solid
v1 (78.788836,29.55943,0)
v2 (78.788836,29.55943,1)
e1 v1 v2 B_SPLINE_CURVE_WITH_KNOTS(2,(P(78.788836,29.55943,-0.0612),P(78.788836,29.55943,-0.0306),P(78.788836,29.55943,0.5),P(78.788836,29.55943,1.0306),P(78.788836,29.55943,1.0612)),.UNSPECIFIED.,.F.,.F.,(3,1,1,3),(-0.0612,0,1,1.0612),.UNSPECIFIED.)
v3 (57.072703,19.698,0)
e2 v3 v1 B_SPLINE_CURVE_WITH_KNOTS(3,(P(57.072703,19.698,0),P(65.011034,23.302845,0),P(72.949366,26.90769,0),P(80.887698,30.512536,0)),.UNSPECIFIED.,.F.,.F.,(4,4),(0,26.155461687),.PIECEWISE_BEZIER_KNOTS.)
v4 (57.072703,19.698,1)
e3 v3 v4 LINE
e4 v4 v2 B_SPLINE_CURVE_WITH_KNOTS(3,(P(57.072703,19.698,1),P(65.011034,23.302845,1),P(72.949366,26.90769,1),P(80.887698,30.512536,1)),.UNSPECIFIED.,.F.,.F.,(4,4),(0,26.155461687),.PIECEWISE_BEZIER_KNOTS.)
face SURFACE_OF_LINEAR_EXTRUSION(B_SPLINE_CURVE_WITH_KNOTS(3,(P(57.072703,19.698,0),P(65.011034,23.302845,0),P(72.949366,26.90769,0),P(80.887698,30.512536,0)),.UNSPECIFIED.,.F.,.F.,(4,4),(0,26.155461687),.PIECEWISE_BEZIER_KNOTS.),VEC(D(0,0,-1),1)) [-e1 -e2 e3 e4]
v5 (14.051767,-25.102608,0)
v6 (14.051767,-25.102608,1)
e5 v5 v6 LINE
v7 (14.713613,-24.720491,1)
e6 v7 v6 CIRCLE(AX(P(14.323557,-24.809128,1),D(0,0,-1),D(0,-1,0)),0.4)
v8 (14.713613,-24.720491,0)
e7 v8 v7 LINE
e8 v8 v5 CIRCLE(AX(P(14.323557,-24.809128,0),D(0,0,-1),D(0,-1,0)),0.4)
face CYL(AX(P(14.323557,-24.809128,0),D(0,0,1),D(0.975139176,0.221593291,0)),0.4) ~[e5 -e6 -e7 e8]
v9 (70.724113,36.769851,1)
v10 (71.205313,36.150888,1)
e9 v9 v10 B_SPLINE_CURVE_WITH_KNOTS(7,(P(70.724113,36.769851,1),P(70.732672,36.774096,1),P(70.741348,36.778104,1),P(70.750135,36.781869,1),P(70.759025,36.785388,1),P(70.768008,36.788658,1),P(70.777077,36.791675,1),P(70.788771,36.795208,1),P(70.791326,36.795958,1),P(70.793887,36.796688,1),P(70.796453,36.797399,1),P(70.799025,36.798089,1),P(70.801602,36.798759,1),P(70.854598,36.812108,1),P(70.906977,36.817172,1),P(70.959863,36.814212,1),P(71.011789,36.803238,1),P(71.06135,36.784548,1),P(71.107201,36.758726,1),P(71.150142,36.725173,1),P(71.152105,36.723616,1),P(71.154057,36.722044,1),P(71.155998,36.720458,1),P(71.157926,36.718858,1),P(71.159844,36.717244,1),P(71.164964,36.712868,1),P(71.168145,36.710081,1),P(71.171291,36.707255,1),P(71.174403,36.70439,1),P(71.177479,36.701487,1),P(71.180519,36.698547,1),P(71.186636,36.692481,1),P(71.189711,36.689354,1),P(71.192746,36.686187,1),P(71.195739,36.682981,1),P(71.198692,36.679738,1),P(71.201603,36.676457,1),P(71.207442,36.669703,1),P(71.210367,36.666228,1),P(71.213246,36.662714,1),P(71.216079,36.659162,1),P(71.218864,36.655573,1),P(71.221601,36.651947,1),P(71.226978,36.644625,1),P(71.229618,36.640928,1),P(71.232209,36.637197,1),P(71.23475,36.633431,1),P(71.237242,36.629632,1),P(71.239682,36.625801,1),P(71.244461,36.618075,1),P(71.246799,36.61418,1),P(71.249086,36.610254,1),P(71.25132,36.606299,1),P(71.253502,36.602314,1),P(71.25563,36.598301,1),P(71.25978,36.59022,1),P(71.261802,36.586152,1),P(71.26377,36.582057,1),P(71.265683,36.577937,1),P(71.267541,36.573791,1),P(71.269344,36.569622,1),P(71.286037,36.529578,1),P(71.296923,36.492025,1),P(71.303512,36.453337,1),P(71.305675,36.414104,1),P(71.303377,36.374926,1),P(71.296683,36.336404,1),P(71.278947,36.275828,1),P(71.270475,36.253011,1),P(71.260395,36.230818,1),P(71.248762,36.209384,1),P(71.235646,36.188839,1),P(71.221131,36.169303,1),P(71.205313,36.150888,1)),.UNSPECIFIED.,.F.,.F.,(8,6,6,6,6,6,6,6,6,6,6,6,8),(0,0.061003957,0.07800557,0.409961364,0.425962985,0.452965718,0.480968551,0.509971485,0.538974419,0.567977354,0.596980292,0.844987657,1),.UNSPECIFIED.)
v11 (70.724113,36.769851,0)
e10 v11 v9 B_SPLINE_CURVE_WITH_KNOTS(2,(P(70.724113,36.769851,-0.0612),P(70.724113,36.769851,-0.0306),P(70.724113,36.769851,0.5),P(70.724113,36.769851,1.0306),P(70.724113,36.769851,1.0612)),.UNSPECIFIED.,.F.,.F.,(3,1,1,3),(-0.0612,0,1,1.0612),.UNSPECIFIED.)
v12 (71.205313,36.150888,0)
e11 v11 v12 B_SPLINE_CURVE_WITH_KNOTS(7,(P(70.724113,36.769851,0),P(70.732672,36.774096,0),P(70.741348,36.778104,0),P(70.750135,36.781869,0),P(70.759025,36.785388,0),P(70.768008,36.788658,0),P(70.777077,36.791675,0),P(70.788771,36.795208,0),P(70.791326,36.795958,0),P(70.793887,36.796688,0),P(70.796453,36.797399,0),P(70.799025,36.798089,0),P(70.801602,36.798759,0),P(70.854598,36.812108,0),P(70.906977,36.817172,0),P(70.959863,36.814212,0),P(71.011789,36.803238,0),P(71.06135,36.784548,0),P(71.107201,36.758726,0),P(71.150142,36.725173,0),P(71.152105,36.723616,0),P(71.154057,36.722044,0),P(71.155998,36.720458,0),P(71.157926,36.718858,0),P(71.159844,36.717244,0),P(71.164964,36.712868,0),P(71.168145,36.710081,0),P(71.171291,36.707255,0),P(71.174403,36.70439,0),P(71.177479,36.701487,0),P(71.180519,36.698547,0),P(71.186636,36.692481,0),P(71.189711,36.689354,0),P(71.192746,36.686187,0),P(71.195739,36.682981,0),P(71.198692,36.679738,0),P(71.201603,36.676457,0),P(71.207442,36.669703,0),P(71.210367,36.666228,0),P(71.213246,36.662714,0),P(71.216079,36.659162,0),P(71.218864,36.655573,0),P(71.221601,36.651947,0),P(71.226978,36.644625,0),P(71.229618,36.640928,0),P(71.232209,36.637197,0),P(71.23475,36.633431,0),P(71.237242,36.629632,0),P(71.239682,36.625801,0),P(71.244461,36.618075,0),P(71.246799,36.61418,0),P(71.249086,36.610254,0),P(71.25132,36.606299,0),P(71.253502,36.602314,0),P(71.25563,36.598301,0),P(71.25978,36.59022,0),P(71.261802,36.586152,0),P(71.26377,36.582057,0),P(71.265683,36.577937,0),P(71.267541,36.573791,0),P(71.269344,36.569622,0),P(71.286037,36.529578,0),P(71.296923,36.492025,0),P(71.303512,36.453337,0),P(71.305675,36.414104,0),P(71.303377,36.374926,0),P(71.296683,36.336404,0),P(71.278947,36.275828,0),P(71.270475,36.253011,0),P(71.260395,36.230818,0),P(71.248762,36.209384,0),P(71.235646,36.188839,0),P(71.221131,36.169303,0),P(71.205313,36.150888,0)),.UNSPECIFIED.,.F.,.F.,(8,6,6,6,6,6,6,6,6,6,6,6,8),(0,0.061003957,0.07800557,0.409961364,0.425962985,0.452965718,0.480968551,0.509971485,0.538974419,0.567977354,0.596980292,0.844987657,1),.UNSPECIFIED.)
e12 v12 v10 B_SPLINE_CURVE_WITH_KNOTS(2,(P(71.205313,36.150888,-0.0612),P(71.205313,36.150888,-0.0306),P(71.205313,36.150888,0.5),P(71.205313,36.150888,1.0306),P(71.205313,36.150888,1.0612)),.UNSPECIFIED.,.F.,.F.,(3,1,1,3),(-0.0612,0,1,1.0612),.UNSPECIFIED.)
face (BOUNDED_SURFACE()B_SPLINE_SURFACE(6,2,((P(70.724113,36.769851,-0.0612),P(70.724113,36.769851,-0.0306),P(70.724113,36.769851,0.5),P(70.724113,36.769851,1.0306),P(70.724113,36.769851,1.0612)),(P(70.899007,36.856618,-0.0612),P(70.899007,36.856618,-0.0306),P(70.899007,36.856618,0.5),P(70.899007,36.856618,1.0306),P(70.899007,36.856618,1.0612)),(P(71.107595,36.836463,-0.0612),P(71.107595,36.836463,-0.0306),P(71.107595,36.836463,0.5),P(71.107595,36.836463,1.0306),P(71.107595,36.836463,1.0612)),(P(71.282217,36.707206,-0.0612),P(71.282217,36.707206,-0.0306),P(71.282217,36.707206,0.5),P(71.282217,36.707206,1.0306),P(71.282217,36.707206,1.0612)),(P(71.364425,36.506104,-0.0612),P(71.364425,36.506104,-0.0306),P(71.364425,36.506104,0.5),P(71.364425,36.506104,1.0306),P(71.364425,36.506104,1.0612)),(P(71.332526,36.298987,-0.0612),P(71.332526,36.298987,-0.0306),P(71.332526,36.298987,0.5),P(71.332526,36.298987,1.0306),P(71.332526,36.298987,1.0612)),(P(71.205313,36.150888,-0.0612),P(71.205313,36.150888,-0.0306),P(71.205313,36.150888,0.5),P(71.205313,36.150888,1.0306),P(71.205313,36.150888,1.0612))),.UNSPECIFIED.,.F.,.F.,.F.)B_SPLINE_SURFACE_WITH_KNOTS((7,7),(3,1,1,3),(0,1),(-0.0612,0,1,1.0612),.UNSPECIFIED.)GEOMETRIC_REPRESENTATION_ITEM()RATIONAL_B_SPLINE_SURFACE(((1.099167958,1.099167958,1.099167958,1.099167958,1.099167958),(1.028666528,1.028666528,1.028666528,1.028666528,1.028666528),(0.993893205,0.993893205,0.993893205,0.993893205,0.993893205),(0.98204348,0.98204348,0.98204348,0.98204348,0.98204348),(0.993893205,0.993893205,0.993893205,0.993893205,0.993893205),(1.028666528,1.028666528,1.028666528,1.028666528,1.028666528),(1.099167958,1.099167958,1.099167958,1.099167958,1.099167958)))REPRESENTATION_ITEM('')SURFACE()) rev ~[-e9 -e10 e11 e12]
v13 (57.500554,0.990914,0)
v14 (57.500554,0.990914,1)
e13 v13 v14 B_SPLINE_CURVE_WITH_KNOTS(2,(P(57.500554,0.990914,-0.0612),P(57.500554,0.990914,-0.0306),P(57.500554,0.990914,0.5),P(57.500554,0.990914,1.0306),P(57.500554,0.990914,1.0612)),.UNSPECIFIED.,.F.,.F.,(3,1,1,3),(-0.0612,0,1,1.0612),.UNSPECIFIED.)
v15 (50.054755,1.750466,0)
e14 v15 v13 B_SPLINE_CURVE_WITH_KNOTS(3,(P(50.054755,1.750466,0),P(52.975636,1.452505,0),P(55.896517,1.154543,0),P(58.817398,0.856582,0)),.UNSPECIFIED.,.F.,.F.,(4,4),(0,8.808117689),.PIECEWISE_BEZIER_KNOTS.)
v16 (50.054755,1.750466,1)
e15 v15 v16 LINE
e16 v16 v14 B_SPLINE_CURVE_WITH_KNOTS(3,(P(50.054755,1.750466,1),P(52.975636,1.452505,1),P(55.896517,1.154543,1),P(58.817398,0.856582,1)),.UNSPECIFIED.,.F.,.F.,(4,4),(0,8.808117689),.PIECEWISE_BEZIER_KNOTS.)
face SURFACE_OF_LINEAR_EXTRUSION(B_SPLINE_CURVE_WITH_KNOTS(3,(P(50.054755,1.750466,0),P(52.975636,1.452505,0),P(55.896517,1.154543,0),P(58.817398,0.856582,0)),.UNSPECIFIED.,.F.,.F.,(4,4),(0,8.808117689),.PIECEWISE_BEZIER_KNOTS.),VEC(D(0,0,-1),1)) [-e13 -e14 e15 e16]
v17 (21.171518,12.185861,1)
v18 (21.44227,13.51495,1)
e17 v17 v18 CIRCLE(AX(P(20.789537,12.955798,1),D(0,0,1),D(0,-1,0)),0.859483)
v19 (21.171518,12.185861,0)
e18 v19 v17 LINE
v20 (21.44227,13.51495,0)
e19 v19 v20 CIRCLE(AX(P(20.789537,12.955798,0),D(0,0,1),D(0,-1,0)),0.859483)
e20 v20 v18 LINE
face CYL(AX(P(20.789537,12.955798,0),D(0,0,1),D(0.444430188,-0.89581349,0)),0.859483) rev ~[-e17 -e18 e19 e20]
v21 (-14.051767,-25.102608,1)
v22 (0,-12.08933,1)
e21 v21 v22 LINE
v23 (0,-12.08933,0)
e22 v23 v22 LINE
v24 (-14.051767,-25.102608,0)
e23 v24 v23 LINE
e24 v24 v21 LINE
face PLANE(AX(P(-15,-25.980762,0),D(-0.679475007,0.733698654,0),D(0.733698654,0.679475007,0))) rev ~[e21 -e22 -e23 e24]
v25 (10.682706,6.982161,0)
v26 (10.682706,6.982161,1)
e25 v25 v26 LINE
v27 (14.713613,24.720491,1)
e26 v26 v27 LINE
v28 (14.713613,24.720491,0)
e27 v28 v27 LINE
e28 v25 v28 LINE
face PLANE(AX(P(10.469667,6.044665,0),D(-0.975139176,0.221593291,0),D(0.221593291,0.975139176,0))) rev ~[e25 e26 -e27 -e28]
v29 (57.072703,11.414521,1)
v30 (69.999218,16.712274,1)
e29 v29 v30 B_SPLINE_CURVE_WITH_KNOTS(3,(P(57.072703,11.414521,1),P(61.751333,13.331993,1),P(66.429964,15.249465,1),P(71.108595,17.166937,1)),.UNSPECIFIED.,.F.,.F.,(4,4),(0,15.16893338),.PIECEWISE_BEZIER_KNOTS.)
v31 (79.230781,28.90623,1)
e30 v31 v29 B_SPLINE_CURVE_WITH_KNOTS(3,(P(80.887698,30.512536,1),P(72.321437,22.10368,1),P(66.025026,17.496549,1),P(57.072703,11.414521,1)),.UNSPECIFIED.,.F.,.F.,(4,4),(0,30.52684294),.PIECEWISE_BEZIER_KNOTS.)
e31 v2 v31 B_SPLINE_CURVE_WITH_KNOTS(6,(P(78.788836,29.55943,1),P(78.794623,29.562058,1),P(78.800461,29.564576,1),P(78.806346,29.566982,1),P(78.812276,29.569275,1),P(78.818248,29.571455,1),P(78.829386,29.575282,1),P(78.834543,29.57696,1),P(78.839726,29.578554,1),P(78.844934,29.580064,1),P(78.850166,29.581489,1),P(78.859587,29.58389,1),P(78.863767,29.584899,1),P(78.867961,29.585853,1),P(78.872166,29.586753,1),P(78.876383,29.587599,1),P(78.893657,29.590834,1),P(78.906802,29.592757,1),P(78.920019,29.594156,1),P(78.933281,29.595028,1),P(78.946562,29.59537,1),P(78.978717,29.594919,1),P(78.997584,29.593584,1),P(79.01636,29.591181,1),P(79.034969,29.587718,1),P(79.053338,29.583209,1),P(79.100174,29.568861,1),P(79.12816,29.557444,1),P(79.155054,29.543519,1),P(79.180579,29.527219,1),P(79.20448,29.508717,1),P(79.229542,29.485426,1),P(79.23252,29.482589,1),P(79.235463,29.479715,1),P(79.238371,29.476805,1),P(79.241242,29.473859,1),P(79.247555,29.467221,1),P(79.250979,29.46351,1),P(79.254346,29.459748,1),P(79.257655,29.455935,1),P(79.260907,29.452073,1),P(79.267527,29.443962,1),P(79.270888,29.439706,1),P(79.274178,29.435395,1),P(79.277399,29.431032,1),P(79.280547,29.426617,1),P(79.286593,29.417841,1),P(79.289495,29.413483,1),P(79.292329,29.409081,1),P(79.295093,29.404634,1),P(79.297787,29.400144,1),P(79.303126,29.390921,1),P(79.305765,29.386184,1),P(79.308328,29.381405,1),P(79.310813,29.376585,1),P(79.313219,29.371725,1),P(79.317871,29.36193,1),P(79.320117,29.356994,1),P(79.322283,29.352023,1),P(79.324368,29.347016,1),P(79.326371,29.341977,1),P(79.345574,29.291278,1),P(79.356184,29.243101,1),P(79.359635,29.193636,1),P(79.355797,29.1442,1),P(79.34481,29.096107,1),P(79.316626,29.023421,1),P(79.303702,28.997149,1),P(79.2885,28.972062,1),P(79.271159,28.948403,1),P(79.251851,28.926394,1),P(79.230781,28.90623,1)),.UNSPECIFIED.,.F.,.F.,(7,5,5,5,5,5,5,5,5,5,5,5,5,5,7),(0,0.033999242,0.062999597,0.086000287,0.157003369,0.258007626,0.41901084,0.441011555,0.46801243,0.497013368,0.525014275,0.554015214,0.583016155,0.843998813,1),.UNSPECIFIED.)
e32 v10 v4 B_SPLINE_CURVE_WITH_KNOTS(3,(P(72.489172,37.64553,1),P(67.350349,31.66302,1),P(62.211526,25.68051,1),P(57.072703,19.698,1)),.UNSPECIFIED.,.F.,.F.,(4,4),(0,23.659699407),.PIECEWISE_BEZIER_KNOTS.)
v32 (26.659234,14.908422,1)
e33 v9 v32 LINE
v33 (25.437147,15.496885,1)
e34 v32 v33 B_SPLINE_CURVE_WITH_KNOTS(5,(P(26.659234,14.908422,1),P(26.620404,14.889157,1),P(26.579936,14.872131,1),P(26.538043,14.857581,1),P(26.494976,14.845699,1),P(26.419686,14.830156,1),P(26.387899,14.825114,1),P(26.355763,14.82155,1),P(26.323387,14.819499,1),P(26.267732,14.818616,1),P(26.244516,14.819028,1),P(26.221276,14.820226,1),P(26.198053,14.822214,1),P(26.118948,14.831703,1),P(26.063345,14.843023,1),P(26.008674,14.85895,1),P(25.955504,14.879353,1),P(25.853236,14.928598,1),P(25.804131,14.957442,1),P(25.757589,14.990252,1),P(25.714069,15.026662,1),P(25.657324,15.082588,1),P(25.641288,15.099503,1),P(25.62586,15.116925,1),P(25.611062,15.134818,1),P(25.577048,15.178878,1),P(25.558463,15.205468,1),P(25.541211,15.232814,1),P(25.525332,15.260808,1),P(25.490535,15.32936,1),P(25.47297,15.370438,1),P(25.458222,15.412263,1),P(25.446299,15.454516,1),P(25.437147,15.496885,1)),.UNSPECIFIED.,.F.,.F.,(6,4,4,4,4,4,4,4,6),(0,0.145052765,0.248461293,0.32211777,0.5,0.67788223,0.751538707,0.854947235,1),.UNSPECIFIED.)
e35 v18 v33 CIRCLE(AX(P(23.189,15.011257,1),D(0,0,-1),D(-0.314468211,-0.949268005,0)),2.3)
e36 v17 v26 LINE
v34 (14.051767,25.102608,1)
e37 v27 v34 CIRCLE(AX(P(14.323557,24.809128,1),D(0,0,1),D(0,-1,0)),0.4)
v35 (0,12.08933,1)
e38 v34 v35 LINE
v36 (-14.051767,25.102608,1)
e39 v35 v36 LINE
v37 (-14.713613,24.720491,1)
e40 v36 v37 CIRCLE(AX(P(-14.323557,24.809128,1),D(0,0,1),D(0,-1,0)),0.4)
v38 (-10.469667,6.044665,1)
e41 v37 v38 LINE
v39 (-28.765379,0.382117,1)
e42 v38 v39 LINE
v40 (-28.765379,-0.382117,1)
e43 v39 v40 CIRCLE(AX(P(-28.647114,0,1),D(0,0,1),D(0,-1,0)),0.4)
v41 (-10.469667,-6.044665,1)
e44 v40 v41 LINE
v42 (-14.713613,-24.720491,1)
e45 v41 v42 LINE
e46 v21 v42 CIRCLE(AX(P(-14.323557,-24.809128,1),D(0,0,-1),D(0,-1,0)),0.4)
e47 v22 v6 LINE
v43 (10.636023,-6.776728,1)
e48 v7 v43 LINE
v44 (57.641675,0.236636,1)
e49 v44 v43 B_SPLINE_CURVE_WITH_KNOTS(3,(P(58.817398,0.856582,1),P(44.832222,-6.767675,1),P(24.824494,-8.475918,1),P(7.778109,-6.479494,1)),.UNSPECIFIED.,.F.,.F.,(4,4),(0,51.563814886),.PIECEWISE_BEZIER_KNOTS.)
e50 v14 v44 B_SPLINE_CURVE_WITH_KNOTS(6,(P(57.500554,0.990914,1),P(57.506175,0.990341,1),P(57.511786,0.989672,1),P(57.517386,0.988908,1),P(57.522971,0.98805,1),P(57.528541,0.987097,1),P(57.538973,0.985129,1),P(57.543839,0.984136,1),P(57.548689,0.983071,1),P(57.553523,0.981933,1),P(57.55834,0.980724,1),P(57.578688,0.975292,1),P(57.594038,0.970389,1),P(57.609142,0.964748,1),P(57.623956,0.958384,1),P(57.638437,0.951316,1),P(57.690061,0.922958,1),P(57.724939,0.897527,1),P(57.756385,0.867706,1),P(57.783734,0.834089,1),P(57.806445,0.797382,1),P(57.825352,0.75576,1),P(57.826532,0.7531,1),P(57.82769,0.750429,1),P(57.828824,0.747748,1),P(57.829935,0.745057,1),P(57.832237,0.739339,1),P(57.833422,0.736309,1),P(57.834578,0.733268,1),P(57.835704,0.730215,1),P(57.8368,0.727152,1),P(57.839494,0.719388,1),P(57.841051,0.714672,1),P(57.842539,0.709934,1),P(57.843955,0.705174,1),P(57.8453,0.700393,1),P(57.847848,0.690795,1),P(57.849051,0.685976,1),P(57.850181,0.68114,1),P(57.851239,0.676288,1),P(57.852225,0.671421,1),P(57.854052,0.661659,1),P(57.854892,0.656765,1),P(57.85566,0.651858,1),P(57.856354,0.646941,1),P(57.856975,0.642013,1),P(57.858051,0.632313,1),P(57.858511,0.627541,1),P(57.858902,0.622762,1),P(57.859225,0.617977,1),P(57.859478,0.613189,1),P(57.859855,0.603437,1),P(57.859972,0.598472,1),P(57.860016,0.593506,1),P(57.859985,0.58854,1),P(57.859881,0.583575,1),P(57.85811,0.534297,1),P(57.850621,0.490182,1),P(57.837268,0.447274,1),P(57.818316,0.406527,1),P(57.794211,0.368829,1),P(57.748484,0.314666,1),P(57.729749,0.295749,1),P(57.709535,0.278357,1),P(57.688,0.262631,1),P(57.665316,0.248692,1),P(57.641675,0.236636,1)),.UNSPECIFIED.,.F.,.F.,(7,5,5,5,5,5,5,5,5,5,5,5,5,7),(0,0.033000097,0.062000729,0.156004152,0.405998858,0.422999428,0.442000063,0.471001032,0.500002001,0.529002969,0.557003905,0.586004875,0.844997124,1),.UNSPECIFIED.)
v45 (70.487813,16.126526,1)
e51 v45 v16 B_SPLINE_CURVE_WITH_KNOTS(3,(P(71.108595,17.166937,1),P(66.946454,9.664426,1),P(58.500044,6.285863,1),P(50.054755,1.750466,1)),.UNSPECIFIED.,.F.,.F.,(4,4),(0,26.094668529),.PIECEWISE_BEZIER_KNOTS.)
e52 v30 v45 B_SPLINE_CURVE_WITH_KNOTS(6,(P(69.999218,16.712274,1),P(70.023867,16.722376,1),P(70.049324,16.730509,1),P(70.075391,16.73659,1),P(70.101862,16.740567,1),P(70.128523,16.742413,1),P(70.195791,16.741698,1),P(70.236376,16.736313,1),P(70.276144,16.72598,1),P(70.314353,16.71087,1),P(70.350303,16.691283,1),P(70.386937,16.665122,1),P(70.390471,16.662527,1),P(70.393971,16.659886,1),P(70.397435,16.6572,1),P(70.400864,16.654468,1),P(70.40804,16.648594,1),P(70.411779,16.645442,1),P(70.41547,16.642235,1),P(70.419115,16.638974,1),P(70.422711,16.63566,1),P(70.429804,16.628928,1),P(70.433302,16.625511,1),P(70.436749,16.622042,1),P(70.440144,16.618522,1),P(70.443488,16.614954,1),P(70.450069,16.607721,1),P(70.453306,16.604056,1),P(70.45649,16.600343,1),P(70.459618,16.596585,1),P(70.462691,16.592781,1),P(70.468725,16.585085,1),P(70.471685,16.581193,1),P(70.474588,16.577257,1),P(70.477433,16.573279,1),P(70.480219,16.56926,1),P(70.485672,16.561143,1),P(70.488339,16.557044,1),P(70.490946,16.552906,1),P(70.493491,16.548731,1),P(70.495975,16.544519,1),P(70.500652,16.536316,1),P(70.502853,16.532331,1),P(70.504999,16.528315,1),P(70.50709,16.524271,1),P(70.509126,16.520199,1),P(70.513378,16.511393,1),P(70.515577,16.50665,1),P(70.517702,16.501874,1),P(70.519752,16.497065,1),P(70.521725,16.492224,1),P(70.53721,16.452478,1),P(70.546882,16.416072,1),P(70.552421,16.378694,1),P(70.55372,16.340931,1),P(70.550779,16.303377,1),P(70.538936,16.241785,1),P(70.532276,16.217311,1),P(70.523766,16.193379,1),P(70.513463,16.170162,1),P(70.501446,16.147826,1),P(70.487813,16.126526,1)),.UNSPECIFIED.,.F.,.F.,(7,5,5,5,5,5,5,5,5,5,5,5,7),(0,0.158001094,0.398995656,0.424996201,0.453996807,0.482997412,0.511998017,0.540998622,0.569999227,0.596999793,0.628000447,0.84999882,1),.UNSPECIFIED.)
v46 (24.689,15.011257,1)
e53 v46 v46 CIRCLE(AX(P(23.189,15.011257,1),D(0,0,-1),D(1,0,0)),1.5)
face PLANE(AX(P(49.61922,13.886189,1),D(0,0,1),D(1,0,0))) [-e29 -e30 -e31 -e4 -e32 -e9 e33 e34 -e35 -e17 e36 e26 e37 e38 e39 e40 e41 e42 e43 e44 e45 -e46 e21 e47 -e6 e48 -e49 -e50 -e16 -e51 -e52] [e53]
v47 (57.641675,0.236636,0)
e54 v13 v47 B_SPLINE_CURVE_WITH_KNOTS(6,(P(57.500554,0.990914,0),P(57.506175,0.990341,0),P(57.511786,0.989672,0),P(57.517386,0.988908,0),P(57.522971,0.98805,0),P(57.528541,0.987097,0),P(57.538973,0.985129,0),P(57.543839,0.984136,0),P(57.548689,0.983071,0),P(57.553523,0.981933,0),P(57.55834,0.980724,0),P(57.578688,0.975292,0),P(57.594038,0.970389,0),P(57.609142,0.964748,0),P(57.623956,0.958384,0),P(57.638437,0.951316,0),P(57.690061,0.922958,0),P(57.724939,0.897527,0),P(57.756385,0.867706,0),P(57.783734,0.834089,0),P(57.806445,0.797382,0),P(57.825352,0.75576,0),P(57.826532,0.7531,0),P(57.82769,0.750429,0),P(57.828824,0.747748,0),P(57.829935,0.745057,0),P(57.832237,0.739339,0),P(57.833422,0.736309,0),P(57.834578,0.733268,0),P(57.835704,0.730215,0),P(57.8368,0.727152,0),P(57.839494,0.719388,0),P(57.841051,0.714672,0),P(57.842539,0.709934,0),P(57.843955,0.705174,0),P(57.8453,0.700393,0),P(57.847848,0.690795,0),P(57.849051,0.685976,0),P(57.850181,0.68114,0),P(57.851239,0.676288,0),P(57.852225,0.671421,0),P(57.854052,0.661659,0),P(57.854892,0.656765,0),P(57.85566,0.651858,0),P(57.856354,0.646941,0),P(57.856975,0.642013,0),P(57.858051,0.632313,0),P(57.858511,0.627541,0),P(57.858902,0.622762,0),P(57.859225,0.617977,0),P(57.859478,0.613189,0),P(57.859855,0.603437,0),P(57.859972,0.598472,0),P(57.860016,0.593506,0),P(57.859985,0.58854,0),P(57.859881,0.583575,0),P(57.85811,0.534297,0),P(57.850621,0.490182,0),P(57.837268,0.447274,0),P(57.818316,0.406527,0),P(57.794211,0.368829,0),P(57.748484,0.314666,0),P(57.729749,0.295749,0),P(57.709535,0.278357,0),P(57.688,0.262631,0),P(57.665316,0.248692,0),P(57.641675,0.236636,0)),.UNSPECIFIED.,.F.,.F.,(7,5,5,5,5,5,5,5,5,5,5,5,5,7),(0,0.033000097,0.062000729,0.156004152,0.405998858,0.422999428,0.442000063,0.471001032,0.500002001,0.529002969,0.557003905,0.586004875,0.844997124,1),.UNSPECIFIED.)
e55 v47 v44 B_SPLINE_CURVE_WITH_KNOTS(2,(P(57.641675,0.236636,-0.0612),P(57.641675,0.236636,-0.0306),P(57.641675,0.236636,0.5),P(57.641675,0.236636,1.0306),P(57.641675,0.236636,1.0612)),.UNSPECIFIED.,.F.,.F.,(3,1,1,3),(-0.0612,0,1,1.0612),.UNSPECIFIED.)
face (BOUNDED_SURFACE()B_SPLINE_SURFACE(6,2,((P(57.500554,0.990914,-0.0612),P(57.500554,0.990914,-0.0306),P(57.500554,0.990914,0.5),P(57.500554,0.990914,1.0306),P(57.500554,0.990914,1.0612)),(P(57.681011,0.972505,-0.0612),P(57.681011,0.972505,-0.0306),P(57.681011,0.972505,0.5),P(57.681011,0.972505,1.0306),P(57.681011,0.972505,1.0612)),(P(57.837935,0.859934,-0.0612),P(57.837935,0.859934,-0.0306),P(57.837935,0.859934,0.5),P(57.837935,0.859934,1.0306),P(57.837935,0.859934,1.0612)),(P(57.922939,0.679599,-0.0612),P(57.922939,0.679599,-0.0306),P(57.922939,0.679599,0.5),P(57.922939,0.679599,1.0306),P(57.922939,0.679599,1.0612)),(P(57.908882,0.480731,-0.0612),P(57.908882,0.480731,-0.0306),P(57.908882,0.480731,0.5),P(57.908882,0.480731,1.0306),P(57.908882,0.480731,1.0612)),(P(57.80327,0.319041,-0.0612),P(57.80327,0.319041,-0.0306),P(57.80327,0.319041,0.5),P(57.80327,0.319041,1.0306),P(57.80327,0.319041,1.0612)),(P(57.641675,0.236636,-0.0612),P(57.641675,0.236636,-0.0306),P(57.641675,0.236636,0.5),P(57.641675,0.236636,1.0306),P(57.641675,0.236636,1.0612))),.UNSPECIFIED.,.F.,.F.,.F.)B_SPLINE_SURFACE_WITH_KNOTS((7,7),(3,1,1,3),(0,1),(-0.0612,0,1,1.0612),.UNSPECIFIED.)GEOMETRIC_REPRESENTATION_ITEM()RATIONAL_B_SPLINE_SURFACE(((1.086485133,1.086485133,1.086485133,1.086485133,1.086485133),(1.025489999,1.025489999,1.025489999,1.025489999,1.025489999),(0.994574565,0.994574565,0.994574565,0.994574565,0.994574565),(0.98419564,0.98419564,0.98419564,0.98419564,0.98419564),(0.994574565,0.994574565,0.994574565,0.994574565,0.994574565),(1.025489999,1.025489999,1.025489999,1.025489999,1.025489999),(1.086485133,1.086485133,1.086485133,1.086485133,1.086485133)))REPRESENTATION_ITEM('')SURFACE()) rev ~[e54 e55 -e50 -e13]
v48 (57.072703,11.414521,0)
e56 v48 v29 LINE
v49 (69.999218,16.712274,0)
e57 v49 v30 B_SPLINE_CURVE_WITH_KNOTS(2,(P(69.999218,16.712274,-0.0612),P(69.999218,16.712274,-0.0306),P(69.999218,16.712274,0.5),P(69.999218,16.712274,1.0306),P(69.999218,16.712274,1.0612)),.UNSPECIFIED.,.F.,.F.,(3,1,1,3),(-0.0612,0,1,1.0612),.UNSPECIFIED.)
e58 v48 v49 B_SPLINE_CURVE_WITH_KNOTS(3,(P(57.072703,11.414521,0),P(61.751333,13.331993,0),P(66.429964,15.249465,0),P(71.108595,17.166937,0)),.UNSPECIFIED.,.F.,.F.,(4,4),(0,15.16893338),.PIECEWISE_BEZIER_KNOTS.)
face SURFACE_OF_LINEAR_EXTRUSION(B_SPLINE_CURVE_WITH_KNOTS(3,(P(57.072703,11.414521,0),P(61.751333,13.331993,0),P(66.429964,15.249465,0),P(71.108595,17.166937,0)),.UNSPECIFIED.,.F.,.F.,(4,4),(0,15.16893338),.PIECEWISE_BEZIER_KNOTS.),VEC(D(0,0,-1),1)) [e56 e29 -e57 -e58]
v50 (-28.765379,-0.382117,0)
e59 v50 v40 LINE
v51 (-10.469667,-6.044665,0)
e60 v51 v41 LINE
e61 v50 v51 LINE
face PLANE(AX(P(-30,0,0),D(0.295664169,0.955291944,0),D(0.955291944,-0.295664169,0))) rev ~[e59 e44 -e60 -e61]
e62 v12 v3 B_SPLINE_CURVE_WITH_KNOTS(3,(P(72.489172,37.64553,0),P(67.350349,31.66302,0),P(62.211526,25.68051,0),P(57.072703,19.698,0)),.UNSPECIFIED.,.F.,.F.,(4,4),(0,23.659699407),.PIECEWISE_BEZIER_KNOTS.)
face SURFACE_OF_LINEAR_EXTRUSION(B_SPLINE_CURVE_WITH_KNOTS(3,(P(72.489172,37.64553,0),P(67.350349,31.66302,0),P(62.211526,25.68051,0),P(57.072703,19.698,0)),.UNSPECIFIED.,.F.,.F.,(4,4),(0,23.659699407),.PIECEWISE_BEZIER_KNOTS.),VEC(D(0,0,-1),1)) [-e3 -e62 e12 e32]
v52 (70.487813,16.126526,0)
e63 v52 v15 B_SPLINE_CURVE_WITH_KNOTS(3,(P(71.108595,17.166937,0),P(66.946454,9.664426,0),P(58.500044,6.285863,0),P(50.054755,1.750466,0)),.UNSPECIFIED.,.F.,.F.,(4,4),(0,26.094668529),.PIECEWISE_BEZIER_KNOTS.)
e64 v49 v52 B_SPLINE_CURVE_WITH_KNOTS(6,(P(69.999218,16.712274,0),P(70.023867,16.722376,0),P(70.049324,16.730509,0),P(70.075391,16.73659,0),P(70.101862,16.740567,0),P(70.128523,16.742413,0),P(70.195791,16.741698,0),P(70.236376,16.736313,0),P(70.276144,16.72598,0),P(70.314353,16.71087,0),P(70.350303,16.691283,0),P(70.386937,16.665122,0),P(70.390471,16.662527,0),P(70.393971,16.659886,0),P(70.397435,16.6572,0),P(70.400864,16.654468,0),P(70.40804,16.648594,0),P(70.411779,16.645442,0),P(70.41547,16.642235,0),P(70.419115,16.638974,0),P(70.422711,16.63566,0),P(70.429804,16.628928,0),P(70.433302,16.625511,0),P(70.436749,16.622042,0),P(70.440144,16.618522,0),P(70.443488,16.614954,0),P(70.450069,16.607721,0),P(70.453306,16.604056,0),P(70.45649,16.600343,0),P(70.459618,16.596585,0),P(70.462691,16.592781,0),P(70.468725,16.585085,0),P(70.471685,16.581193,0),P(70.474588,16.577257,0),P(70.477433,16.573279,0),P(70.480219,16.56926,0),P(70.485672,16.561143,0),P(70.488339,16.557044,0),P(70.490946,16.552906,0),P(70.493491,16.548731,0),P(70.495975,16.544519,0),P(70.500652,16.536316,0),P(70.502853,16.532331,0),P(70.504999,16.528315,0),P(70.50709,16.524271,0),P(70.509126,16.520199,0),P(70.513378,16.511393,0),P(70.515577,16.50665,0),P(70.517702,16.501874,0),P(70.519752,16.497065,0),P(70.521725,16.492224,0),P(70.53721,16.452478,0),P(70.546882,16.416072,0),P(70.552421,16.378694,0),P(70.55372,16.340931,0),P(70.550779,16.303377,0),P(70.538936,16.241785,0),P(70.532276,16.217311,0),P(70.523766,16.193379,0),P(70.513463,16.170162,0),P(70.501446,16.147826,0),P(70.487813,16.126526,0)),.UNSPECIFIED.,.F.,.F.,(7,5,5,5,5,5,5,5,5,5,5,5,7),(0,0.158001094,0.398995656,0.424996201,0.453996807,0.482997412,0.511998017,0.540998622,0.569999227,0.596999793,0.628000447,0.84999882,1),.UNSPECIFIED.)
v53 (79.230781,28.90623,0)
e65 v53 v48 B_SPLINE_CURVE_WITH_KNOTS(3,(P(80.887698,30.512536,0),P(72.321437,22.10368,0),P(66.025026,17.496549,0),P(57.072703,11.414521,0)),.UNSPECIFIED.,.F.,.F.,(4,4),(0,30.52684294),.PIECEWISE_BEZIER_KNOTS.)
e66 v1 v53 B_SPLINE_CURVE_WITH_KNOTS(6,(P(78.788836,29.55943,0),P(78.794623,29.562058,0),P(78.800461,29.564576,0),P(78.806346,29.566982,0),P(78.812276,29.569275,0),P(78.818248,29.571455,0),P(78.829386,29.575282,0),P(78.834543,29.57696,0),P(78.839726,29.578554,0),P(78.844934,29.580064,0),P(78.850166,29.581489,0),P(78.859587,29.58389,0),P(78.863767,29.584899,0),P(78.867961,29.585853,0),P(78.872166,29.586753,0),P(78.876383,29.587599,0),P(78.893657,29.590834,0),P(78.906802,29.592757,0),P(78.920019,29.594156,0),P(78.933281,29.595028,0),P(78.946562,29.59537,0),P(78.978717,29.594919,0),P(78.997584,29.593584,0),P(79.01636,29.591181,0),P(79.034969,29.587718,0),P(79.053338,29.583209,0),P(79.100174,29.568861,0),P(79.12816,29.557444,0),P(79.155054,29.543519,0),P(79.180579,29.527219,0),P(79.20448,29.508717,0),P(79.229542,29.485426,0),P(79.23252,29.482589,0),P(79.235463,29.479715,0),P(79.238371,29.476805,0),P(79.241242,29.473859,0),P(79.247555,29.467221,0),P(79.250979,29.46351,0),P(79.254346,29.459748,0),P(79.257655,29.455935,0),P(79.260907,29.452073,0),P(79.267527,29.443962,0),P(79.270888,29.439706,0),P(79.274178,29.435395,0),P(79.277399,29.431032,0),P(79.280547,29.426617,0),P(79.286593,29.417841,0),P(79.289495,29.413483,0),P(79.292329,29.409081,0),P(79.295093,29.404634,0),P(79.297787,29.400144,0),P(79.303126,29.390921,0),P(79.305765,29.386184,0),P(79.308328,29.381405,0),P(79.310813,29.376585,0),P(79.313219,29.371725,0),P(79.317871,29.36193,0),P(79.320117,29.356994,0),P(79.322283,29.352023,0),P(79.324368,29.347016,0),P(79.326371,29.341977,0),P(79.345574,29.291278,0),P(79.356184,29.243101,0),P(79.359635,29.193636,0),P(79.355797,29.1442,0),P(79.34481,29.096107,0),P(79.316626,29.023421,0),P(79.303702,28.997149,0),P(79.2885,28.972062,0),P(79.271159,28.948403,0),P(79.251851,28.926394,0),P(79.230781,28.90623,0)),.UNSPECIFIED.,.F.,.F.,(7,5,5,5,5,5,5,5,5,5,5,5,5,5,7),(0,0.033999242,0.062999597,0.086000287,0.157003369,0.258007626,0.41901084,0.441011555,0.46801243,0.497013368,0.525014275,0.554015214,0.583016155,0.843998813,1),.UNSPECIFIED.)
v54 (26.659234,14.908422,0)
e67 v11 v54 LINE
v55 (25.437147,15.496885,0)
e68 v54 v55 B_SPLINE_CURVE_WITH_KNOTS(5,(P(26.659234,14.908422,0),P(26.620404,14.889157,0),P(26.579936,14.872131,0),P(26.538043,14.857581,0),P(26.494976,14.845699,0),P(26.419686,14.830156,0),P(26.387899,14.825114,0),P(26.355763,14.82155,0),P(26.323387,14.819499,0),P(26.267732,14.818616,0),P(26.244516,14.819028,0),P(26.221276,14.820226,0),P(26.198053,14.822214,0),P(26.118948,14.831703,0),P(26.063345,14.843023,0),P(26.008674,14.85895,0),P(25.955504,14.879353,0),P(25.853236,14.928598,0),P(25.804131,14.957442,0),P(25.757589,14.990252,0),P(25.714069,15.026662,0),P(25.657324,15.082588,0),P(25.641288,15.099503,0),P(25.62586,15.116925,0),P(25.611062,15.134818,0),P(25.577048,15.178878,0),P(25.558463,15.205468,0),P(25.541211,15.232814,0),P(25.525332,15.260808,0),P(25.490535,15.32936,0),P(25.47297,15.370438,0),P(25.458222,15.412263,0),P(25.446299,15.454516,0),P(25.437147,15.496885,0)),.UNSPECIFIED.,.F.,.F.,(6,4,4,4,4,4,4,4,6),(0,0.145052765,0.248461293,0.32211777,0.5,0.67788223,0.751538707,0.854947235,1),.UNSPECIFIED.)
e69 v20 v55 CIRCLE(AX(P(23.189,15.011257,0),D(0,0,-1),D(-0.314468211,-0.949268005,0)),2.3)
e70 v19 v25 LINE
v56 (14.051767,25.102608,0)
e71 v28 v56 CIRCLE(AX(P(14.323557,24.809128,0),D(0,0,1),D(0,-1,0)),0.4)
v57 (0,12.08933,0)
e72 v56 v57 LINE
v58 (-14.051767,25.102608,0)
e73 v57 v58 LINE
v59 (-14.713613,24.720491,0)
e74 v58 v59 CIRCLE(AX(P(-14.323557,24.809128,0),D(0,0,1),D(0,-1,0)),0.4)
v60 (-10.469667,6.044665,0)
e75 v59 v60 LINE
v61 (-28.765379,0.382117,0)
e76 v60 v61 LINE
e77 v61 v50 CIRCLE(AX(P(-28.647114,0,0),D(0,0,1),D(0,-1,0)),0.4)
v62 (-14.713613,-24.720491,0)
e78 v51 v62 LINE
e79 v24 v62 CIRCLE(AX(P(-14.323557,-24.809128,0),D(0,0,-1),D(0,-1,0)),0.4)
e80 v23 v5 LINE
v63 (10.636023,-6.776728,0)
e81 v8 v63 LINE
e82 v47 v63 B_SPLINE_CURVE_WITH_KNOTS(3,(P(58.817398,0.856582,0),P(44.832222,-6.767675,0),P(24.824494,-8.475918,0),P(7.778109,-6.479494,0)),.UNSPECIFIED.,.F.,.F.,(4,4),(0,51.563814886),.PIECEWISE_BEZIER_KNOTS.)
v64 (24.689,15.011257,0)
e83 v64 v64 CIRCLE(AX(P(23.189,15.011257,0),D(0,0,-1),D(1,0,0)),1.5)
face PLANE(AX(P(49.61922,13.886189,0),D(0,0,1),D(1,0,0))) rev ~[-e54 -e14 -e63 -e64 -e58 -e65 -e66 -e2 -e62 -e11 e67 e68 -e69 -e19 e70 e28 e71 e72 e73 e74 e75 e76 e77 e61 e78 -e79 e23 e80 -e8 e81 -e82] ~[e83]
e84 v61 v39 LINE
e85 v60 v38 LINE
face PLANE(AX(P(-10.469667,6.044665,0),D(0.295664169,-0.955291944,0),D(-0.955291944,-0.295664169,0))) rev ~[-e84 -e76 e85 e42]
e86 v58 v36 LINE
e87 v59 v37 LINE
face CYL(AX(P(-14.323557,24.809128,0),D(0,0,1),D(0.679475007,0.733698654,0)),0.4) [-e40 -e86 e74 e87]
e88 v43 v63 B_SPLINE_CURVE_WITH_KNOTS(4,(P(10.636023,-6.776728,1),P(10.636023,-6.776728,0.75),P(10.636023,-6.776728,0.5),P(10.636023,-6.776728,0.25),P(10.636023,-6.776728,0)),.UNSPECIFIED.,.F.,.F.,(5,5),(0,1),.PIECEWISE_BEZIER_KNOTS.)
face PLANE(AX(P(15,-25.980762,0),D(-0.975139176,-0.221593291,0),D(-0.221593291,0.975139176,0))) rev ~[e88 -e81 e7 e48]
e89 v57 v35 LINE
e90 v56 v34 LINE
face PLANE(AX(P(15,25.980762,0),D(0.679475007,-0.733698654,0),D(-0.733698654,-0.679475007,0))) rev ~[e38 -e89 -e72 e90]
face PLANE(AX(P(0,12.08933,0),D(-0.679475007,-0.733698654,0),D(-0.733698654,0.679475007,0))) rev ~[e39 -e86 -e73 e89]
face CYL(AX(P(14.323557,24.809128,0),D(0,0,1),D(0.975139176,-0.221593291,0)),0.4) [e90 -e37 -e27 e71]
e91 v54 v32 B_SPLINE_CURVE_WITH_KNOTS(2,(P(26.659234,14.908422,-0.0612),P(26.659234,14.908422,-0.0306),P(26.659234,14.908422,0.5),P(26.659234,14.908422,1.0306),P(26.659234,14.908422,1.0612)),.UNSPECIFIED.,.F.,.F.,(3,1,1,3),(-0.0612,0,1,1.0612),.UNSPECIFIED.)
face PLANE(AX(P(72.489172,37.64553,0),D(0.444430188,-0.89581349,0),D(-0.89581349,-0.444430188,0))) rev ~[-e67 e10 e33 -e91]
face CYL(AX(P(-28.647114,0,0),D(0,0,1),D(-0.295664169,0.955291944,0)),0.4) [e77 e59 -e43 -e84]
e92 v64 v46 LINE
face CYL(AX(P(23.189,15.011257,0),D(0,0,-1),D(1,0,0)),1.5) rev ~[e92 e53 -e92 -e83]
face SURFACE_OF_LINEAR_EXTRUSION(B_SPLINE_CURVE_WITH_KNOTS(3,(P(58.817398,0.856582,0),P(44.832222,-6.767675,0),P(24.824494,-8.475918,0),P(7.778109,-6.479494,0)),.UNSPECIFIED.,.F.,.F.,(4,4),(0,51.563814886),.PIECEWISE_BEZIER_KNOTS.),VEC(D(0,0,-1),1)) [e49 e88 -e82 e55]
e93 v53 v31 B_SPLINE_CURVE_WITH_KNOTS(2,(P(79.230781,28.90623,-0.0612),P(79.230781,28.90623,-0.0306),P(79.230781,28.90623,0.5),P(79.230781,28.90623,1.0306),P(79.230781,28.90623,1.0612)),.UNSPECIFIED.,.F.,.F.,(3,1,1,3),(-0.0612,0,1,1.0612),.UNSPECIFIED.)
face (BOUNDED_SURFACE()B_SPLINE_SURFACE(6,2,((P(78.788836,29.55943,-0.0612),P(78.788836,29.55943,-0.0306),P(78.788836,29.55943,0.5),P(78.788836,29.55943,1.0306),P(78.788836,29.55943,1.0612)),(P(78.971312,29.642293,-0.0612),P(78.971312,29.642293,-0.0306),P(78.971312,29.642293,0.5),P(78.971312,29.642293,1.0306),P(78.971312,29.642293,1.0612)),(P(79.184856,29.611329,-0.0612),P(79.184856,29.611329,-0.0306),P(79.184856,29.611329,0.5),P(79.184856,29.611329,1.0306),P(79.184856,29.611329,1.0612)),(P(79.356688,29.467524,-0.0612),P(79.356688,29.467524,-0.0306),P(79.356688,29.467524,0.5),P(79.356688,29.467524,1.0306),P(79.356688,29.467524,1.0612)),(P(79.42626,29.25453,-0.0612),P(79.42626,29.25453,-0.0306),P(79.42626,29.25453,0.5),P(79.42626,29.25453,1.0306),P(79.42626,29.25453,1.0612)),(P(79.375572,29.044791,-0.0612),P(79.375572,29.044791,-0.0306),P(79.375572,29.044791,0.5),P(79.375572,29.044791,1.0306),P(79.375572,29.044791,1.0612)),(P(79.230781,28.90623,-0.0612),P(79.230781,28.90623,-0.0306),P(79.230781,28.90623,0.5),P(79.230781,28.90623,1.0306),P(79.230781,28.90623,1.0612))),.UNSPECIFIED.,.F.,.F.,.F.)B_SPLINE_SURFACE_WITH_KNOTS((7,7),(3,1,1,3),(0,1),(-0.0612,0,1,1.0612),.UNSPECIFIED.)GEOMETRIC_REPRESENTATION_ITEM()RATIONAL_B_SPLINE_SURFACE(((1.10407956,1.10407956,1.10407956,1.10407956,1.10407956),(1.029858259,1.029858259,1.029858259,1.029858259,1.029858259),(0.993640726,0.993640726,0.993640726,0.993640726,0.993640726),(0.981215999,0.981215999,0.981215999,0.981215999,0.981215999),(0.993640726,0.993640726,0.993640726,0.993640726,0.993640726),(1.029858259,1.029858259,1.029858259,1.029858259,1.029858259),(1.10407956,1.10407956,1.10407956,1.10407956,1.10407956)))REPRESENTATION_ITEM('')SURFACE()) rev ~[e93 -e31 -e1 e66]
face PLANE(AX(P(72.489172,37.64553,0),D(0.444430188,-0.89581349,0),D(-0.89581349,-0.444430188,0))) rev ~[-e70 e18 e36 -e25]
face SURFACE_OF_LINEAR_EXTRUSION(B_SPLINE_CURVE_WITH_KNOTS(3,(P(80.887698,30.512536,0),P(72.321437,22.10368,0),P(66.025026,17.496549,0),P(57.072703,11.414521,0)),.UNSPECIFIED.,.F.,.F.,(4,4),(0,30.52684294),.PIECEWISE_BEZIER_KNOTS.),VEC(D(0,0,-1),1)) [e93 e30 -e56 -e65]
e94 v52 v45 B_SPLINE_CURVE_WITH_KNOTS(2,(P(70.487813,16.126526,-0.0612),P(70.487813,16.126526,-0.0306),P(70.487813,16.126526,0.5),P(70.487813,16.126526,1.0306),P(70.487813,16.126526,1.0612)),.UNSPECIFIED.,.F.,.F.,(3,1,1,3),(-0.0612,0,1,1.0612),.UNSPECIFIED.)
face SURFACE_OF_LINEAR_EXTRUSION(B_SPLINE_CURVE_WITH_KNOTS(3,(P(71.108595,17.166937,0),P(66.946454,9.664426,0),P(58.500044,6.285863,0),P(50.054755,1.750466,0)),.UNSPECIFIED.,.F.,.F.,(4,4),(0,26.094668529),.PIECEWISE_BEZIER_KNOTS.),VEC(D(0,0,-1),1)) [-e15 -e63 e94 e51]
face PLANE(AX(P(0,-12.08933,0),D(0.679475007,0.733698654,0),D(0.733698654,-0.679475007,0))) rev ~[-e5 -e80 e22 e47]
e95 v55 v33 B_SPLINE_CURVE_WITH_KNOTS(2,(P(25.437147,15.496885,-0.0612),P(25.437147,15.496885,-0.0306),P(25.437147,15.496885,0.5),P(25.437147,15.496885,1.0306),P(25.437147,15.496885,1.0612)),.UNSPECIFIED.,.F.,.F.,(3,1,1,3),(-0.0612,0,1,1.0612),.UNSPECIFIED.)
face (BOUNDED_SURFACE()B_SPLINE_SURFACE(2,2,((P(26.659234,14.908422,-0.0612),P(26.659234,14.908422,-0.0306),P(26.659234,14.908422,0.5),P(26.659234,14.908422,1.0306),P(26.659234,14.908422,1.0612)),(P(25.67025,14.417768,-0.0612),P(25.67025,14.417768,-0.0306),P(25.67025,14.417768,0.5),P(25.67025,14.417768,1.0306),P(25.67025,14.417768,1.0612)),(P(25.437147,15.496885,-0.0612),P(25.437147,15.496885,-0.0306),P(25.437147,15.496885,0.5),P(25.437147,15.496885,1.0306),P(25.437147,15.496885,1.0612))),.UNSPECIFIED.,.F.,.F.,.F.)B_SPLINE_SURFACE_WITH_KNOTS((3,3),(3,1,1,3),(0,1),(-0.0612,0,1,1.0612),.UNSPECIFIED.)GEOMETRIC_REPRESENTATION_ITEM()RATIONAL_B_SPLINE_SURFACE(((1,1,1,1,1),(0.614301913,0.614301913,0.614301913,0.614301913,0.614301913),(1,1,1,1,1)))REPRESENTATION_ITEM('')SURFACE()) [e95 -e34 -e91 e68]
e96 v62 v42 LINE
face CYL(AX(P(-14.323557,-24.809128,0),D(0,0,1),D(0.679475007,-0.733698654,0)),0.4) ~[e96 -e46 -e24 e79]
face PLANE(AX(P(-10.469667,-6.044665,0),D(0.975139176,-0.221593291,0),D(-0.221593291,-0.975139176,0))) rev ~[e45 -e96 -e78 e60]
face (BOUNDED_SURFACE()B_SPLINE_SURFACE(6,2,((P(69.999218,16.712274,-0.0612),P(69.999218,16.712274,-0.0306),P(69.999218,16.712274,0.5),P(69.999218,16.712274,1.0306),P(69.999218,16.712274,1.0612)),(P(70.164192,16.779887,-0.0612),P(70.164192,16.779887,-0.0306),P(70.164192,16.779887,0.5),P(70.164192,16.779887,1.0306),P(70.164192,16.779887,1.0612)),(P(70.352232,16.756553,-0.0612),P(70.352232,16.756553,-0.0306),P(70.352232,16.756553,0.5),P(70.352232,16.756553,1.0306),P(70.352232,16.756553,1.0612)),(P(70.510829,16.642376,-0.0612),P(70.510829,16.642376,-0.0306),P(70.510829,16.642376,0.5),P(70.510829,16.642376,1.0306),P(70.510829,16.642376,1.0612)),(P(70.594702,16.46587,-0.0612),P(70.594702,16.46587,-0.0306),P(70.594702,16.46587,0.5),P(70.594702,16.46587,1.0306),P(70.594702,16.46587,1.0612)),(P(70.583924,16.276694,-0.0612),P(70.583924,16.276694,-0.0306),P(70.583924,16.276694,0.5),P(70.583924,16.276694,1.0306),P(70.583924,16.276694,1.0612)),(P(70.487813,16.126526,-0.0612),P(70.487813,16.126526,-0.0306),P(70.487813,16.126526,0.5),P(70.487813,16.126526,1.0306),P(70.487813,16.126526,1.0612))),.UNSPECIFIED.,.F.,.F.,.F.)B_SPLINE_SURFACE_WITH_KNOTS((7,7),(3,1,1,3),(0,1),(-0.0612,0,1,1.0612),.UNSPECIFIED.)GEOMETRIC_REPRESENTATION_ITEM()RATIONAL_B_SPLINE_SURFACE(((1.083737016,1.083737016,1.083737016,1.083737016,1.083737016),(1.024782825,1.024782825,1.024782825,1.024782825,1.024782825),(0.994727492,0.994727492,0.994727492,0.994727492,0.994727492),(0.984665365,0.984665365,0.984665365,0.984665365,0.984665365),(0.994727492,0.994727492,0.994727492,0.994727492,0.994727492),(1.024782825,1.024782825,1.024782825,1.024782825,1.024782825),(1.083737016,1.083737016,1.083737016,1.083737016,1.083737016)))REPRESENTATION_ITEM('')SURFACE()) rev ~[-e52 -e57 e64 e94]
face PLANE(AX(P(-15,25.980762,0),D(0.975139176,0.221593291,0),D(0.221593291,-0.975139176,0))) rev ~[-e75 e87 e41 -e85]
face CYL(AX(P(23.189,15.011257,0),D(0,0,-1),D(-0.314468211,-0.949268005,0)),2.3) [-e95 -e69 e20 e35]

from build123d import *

# Parameters (mm, degrees)
F2_DEPTH = 1
F3_DEPTH = 1
F4_R     = 1.5
F5_DEPTH = 1
F6_R     = 0.8594833568
F7_R     = 0.4


with BuildPart() as f2:
    # F0 (on Top) → F2 (new body)
    with BuildSketch(Plane.XY):
        Polygon((0, 12.0893299047), (-15, 25.9807621135), (-10.4696668122, 6.0446649524), (-30, 0), (-10.4696668122, -6.0446649524), (-15, -25.9807621135), (0, -12.0893299047), (15, -25.9807621135), (10.4696668122, -6.0446649524), (30, 0), (10.4696668122, 6.0446649524), (15, 25.9807621135), align=None)
    extrude(amount=F2_DEPTH)

    # F1 (on Top) → F3 (join)
    with BuildSketch(Plane.XY):
        with BuildLine():
            Line((72.4891722202, 37.6455299556), (7.3894136585, 5.3482959047))
            Line((7.3894136585, 5.3482959047), (7.7781090513, -6.4794942737))
            add(Edge.make_bspline(
                [(58.8173978031, 0.8565816097), (44.8322221637, -6.7676748149), (24.8244935647, -8.4759178571), (7.7781090513, -6.4794942737)],
                knots=[0, 0, 0, 0, 51.5638148865, 51.5638148865, 51.5638148865, 51.5638148865], degree=3))
            add(Edge.make_bspline(
                [(50.0547550619, 1.7504660645), (52.9756359756, 1.4525045796), (55.8965168893, 1.1545430946), (58.8173978031, 0.8565816097)],
                knots=[0, 0, 0, 0, 8.8081176893, 8.8081176893, 8.8081176893, 8.8081176893], degree=3))
            add(Edge.make_bspline(
                [(71.1085945368, 17.1669367701), (66.9464543462, 9.6644256264), (58.5000440478, 6.2858634628), (50.0547550619, 1.7504660645)],
                knots=[0, 0, 0, 0, 26.0946685292, 26.0946685292, 26.0946685292, 26.0946685292], degree=3))
            add(Edge.make_bspline(
                [(57.0727027953, 11.4145213738), (61.7513333758, 13.3319931726), (66.4299639563, 15.2494649713), (71.1085945368, 17.1669367701)],
                knots=[0, 0, 0, 0, 15.1689333795, 15.1689333795, 15.1689333795, 15.1689333795], degree=3))
            add(Edge.make_bspline(
                [(80.8876976371, 30.5125359446), (72.3214372993, 22.1036802977), (66.0250261426, 17.496548593), (57.0727027953, 11.4145213738)],
                knots=[0, 0, 0, 0, 30.5268429396, 30.5268429396, 30.5268429396, 30.5268429396], degree=3))
            add(Edge.make_bspline(
                [(57.0727027953, 19.6979995817), (65.0110344092, 23.302845036), (72.9493660231, 26.9076904903), (80.8876976371, 30.5125359446)],
                knots=[0, 0, 0, 0, 26.155461687, 26.155461687, 26.155461687, 26.155461687], degree=3))
            add(Edge.make_bspline(
                [(72.4891722202, 37.6455299556), (67.3503490786, 31.663019831), (62.2115259369, 25.6805097063), (57.0727027953, 19.6979995817)],
                knots=[0, 0, 0, 0, 23.6596994075, 23.6596994075, 23.6596994075, 23.6596994075], degree=3))
        make_face()
    extrude(amount=F3_DEPTH)

    # F4 (on face) → F5 (join)
    with BuildSketch(Plane(origin=(0, 0, 0), x_dir=(1, 0, 0), z_dir=(0, 0, -1))):
        with BuildLine():
            ThreePointArc((22.4657231152, -12.8279410816), (21.8424371227, -16.8758669464), (25.489, -15.011257492))
            ThreePointArc((25.489, -15.011257492), (25.4577954947, -14.6336770325), (25.3650286927, -14.2663419742))
            Line((25.3650286927, -14.2663419742), (22.4657231152, -12.8279410816))
        make_face()
        with Locations((23.189, -15.011257492)):
            Circle(F4_R, mode=Mode.SUBTRACT)
    extrude(amount=-F5_DEPTH)

    # F6
    f6_edges = [f2.edges().sort_by_distance(p)[0] for p in [
        (25.489, 15.011257, 0.5),
        (25.365029, 14.266342, 0.5),
        (22.465723, 12.827941, 0.5),
    ]]
    fillet(f6_edges, radius=F6_R)

    # F7
    f7_edges = [f2.edges().sort_by_distance(p)[0] for p in [
        (15, 25.980762, 0.5),
        (-15, 25.980762, 0.5),
        (-30, 0, 0.5),
        (-15, -25.980762, 0.5),
        (15, -25.980762, 0.5),
        (72.489172, 37.64553, 0.5),
        (80.887698, 30.512536, 0.5),
        (71.108595, 17.166937, 0.5),
        (58.817398, 0.856582, 0.5),
    ]]
    fillet(f7_edges, radius=F7_R)


solid = f2.part
